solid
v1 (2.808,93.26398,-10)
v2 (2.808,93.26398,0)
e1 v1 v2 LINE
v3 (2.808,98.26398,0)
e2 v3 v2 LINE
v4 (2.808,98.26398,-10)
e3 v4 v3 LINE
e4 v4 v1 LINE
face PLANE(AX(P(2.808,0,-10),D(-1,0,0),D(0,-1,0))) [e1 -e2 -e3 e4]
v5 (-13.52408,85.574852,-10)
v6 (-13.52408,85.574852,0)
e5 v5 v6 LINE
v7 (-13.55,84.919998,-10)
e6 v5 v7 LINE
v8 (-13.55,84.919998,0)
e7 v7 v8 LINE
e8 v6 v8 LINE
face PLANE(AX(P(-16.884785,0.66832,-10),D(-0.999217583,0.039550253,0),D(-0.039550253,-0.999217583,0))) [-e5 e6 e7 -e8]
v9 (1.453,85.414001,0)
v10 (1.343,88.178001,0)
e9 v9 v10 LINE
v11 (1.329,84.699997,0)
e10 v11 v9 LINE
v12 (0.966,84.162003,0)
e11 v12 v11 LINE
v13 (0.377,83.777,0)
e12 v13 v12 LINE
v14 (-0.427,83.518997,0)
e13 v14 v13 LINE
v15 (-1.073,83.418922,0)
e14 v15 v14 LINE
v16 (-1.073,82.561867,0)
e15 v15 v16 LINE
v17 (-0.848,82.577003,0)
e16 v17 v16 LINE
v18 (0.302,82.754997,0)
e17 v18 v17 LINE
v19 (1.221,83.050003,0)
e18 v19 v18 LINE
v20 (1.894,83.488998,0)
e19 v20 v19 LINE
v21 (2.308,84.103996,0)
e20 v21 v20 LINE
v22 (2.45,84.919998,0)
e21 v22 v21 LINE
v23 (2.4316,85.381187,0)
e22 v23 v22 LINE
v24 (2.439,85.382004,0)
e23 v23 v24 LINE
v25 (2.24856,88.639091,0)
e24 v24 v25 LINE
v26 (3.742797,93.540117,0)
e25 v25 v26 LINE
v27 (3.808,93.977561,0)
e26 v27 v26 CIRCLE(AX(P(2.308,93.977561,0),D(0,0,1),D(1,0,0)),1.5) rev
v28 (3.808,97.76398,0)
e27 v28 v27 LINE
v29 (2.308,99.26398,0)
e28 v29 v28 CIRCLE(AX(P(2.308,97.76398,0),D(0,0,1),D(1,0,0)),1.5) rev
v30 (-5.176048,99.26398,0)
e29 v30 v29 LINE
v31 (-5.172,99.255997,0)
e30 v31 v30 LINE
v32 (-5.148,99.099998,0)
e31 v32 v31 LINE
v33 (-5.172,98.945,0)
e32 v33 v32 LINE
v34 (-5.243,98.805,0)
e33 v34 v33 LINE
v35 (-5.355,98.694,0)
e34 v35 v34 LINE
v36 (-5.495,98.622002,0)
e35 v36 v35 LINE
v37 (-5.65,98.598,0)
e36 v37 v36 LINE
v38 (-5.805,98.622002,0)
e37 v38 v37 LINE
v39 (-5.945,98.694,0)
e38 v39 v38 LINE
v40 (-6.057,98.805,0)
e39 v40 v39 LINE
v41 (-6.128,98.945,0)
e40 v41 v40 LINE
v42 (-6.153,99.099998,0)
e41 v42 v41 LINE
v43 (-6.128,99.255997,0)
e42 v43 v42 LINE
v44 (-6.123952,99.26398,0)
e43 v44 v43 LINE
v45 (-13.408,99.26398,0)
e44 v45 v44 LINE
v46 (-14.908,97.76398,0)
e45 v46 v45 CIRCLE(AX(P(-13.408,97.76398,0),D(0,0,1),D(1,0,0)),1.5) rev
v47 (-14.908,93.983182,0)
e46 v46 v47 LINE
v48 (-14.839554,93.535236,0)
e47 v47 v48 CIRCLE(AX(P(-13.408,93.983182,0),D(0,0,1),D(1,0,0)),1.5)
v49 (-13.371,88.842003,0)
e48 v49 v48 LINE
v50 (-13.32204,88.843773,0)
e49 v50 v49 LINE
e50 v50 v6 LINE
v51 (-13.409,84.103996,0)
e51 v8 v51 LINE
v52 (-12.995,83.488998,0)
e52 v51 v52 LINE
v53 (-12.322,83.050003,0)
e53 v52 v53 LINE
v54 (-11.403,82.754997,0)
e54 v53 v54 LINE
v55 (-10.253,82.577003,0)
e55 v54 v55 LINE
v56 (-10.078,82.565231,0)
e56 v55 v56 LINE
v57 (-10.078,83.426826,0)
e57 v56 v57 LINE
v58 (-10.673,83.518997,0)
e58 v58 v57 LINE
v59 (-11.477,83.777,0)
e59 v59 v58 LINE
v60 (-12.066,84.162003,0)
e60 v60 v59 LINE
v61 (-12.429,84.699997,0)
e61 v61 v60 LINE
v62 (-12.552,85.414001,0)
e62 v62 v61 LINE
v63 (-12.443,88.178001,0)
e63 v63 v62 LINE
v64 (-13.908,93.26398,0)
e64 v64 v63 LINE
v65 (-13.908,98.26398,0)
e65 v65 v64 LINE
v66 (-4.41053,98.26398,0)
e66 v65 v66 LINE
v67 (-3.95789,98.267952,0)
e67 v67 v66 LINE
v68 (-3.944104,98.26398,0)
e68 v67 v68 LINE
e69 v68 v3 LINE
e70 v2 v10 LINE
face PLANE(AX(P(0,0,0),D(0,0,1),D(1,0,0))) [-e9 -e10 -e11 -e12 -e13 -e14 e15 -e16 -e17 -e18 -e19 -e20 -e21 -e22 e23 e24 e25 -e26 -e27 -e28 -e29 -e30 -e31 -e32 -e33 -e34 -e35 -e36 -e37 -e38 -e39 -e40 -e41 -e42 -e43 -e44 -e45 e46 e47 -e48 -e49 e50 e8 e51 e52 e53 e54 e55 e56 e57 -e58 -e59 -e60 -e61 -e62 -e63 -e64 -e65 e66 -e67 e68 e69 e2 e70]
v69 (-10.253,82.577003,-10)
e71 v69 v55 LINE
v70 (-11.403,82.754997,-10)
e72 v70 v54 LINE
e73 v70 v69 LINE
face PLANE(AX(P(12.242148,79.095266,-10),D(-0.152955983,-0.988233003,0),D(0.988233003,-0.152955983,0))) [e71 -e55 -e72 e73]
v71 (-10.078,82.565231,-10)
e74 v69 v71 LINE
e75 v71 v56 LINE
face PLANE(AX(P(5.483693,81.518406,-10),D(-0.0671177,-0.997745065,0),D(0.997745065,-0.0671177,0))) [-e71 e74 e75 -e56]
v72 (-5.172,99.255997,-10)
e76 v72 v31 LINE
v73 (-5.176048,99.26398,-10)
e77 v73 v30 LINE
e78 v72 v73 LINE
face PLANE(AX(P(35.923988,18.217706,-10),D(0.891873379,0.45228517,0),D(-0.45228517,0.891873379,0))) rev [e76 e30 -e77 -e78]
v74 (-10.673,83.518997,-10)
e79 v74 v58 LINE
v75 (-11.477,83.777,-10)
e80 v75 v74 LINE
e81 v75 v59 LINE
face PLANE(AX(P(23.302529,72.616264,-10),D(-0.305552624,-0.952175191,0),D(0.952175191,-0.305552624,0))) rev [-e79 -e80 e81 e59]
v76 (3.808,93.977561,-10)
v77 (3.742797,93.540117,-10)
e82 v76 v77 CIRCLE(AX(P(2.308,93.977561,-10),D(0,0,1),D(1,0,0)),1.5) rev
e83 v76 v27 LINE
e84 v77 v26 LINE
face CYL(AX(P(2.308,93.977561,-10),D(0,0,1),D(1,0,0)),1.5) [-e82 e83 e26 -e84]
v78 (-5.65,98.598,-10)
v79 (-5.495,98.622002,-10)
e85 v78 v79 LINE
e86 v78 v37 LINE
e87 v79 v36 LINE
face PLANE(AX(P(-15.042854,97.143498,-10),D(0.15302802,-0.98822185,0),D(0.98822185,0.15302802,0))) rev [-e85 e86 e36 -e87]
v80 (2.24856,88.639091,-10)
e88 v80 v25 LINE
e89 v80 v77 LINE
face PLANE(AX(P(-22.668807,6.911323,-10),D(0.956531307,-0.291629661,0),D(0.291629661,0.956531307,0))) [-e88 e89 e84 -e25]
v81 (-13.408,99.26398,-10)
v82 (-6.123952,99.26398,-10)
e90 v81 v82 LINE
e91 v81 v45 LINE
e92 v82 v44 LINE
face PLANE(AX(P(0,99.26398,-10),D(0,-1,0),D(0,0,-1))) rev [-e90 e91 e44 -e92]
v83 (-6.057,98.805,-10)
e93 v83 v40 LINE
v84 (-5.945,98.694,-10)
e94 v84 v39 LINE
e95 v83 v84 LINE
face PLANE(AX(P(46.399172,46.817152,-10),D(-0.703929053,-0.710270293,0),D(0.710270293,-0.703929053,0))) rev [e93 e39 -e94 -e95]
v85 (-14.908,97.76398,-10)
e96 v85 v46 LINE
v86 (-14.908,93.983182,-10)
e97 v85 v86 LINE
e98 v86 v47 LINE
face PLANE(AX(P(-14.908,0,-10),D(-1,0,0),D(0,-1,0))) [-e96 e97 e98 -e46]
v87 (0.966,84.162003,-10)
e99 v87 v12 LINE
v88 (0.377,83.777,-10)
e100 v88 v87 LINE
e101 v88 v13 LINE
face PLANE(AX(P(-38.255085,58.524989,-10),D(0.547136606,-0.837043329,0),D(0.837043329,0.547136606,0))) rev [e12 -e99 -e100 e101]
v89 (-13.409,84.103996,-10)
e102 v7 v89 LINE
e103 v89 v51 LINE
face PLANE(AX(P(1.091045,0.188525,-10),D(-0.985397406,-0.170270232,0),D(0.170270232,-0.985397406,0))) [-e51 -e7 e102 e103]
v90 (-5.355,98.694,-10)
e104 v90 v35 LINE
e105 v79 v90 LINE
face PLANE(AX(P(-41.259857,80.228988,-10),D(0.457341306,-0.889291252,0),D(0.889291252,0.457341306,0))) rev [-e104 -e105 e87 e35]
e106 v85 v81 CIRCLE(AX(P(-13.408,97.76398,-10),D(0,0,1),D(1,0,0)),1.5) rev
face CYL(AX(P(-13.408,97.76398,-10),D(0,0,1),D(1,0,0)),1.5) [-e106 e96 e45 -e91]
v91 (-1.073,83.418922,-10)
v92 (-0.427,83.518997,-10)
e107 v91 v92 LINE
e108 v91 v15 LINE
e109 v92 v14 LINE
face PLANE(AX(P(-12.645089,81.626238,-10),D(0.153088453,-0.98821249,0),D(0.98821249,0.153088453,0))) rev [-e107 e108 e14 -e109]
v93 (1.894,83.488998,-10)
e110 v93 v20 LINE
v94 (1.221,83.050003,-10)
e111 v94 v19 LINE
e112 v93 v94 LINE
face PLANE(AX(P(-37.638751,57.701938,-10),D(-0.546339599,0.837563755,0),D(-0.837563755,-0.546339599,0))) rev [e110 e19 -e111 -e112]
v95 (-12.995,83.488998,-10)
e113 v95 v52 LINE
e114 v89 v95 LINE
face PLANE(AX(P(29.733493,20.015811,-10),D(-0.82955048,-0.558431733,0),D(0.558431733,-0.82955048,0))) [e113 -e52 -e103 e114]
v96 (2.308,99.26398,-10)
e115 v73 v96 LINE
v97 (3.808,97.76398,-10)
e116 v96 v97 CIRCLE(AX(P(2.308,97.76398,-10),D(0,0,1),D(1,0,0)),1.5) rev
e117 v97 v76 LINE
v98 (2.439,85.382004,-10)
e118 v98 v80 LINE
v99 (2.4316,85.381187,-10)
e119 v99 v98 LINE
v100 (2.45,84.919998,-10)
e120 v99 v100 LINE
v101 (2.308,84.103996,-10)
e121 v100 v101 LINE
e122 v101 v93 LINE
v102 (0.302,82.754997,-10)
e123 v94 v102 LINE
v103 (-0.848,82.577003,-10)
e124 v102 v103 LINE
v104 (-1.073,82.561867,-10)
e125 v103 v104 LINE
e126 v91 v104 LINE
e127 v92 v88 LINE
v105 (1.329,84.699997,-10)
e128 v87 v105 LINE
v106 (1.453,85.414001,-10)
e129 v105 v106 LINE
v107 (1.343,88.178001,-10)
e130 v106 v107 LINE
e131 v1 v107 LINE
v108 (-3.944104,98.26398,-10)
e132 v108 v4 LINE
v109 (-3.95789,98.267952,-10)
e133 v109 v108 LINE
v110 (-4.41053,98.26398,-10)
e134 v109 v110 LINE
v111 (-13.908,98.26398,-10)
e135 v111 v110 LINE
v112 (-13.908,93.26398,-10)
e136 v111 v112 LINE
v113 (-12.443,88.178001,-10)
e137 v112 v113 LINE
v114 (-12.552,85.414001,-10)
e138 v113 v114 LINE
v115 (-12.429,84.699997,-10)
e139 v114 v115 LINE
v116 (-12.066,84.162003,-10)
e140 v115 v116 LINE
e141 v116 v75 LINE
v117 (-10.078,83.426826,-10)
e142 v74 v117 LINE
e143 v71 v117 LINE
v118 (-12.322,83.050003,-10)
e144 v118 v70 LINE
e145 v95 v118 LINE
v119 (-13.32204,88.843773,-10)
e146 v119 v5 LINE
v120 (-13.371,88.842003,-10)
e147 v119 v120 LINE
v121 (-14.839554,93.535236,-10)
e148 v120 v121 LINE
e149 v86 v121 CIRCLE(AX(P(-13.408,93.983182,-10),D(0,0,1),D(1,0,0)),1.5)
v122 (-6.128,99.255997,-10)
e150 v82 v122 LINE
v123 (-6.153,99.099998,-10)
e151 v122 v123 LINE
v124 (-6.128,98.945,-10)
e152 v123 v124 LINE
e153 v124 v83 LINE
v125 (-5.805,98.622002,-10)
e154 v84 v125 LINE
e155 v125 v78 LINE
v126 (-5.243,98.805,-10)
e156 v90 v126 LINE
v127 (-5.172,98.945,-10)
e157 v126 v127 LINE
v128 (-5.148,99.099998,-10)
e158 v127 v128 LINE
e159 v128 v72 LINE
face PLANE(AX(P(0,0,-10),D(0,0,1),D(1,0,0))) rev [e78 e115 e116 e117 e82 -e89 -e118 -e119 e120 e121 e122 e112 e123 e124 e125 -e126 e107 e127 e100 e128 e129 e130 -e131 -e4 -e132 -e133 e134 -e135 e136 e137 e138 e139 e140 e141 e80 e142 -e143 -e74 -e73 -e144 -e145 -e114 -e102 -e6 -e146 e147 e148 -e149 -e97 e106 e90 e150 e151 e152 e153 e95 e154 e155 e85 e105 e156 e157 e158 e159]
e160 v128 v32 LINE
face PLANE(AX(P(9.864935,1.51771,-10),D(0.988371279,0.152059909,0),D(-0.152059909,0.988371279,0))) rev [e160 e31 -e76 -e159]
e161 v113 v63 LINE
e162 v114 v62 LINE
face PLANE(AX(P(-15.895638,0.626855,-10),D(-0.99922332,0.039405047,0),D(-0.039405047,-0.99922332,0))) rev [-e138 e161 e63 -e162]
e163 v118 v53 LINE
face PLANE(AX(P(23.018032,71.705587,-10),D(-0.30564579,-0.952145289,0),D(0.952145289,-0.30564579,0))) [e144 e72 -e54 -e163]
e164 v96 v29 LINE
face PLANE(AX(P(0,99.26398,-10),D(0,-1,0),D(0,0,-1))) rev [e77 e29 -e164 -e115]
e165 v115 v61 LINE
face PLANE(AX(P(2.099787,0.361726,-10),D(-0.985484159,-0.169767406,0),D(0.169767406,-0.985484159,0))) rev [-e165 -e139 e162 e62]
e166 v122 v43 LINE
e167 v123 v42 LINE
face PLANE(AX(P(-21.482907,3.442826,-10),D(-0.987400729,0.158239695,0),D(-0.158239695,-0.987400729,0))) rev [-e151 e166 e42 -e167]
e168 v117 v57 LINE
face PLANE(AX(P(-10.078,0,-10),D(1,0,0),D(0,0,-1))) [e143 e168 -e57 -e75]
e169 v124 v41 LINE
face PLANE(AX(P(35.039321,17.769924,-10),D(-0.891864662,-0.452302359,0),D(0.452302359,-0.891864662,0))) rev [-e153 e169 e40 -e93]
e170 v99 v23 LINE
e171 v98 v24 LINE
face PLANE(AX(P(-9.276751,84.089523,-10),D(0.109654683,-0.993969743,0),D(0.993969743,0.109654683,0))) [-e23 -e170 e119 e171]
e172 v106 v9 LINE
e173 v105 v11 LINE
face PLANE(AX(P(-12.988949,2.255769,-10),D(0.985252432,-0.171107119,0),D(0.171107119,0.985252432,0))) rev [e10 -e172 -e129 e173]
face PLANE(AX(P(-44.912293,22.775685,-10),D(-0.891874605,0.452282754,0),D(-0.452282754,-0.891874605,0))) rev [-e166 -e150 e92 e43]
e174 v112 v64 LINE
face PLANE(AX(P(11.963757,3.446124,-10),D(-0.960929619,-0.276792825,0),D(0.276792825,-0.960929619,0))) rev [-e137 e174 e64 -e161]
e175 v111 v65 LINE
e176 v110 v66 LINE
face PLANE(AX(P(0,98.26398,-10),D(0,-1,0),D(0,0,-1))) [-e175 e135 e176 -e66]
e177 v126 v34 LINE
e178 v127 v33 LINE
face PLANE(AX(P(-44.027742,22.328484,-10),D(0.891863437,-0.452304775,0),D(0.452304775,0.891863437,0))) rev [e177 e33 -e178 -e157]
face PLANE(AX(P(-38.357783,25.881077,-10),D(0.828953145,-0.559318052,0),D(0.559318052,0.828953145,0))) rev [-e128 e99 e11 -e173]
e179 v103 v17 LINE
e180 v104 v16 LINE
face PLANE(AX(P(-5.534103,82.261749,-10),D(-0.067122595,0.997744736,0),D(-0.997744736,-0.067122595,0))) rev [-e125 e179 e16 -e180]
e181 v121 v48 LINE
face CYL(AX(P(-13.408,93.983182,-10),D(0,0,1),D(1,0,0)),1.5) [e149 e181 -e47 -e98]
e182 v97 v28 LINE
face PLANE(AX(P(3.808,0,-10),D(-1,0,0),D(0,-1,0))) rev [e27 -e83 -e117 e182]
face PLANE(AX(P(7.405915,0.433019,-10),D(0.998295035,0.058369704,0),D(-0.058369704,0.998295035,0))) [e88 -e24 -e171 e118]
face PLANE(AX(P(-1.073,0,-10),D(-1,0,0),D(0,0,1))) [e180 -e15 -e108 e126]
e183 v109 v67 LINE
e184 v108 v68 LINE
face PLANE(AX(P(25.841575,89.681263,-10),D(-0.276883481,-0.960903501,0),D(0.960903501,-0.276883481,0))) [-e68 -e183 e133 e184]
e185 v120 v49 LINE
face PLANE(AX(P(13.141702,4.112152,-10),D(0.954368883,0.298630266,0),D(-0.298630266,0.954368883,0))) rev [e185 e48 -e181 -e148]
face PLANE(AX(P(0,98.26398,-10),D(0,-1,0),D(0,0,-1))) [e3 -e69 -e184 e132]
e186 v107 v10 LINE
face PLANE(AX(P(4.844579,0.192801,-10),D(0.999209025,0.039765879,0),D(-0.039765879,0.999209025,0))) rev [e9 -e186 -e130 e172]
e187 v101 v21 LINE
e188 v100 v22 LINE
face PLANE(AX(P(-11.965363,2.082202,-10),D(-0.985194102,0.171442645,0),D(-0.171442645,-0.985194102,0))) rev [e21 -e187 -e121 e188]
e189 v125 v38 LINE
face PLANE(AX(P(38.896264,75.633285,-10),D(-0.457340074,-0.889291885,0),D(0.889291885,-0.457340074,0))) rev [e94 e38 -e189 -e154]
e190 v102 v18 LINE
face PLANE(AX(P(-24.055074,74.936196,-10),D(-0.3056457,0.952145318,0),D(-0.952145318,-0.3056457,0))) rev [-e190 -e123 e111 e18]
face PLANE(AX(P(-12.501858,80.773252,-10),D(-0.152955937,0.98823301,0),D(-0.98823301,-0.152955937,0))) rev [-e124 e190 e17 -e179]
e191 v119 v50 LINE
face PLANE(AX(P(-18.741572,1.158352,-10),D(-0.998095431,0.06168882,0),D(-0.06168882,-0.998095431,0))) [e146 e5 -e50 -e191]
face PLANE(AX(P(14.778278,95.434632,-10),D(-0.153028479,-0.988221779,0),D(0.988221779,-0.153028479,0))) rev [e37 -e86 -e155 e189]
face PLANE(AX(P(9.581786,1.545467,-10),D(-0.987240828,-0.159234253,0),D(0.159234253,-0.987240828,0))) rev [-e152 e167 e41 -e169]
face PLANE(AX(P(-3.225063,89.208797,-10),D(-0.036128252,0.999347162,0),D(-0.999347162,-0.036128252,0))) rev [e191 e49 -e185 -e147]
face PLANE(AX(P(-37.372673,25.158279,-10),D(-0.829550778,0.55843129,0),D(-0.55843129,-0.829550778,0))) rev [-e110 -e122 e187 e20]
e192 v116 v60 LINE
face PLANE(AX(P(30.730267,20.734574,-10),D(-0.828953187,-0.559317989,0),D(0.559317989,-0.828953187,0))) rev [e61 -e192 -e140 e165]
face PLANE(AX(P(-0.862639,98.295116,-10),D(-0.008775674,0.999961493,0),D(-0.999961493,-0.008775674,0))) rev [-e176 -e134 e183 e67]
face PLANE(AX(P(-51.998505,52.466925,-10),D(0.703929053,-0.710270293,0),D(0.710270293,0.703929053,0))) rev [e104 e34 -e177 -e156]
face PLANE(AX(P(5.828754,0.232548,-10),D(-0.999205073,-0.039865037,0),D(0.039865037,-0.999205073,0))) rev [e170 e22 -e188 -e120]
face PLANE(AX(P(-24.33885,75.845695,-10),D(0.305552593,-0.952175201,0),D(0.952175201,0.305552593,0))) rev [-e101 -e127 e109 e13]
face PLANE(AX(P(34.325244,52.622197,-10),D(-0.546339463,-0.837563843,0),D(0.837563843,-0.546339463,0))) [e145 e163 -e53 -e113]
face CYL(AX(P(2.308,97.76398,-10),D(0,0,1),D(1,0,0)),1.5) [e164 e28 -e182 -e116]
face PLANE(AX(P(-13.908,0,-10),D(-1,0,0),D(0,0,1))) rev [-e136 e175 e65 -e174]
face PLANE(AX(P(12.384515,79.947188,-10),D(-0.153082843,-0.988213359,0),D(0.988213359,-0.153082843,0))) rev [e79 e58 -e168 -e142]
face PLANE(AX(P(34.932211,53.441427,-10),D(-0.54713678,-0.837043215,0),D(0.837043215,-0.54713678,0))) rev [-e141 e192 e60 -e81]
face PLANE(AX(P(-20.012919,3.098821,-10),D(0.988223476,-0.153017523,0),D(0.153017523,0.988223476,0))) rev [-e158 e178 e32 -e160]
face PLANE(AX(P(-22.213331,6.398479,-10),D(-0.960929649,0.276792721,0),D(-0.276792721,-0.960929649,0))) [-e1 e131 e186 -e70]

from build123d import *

# Parameters (mm, degrees)
BOSS_EXTRUDE1_DEPTH = 10


# Read off the part's stored shape, not the designer's step: Imported1
with BuildPart() as part:
    # Sketch5 → Boss-Extrude1 (new body)
    with BuildSketch(Plane.XY):
        with BuildLine():
            Line((-6.05700016, 98.805000305), (-6.127999783, 98.944999695))
            Line((-6.127999783, 98.944999695), (-6.152999878, 99.099998474))
            Line((-6.152999878, 99.099998474), (-6.127999783, 99.255996704))
            Line((-6.127999783, 99.255996704), (-6.123951545, 99.263979588))
            Line((-6.123951545, 99.263979588), (-13.408000231, 99.263979588))
            ThreePointArc((-13.408000231, 99.263979588), (-14.468660403, 98.82463976), (-14.908000231, 97.763979588))
            Line((-14.908000231, 97.763979588), (-14.908000231, 93.983181661))
            ThreePointArc((-14.908000231, 93.983181661), (-14.890789829, 93.756609361), (-14.839553555, 93.535236262))
            Line((-14.839553555, 93.535236262), (-13.37100029, 88.842002869))
            Line((-13.37100029, 88.842002869), (-13.322039604, 88.843772888))
            Line((-13.322039604, 88.843772888), (-13.524080276, 85.57485199))
            Line((-13.524080276, 85.57485199), (-13.550000191, 84.919998169))
            Line((-13.550000191, 84.919998169), (-13.409000397, 84.103996277))
            Line((-13.409000397, 84.103996277), (-12.994999886, 83.488998413))
            Line((-12.994999886, 83.488998413), (-12.32199955, 83.050003052))
            Line((-12.32199955, 83.050003052), (-11.402999878, 82.754997253))
            Line((-11.402999878, 82.754997253), (-10.253000259, 82.577003479))
            Line((-10.253000259, 82.577003479), (-10.078000069, 82.565231323))
            Line((-10.078000069, 82.565231323), (-10.078000069, 83.426826477))
            Line((-10.078000069, 83.426826477), (-10.673000336, 83.518997192))
            Line((-10.673000336, 83.518997192), (-11.477000237, 83.777000427))
            Line((-11.477000237, 83.777000427), (-12.065999985, 84.162002563))
            Line((-12.065999985, 84.162002563), (-12.428999901, 84.699996948))
            Line((-12.428999901, 84.699996948), (-12.552000046, 85.414001465))
            Line((-12.552000046, 85.414001465), (-12.44299984, 88.178001404))
            Line((-12.44299984, 88.178001404), (-13.908000231, 93.263979588))
            Line((-13.908000231, 93.263979588), (-13.908000231, 98.263979588))
            Line((-13.908000231, 98.263979588), (-4.410530424, 98.263979588))
            Line((-4.410530424, 98.263979588), (-3.957890034, 98.267951965))
            Line((-3.957890034, 98.267951965), (-3.944104194, 98.263979588))
            Line((-3.944104194, 98.263979588), (2.807999849, 98.263979588))
            Line((2.807999849, 98.263979588), (2.807999849, 93.263979588))
            Line((2.807999849, 93.263979588), (1.343000054, 88.178001404))
            Line((1.343000054, 88.178001404), (1.452999949, 85.414001465))
            Line((1.452999949, 85.414001465), (1.328999996, 84.699996948))
            Line((1.328999996, 84.699996948), (0.966000021, 84.162002563))
            Line((0.966000021, 84.162002563), (0.377000004, 83.777000427))
            Line((0.377000004, 83.777000427), (-0.426999986, 83.518997192))
            Line((-0.426999986, 83.518997192), (-1.072999954, 83.418922424))
            Line((-1.072999954, 83.418922424), (-1.072999954, 82.56186676))
            Line((-1.072999954, 82.56186676), (-0.84799999, 82.577003479))
            Line((-0.84799999, 82.577003479), (0.301999986, 82.754997253))
            Line((0.301999986, 82.754997253), (1.220999956, 83.050003052))
            Line((1.220999956, 83.050003052), (1.894000053, 83.488998413))
            Line((1.894000053, 83.488998413), (2.308000088, 84.103996277))
            Line((2.308000088, 84.103996277), (2.450000048, 84.919998169))
            Line((2.450000048, 84.919998169), (2.431600094, 85.381187439))
            Line((2.431600094, 85.381187439), (2.438999891, 85.382003784))
            Line((2.438999891, 85.382003784), (2.248559952, 88.639091492))
            Line((2.248559952, 88.639091492), (3.742796809, 93.540116743))
            ThreePointArc((3.742796809, 93.540116743), (3.791609542, 93.756422636), (3.807999849, 93.977561235))
            Line((3.807999849, 93.977561235), (3.807999849, 97.763979588))
            ThreePointArc((3.807999849, 97.763979588), (3.368660021, 98.82463976), (2.307999849, 99.263979588))
            Line((2.307999849, 99.263979588), (-5.176048197, 99.263979588))
            Line((-5.176048197, 99.263979588), (-5.171999931, 99.255996704))
            Line((-5.171999931, 99.255996704), (-5.147999763, 99.099998474))
            Line((-5.147999763, 99.099998474), (-5.171999931, 98.944999695))
            Line((-5.171999931, 98.944999695), (-5.243000031, 98.805000305))
            Line((-5.243000031, 98.805000305), (-5.355000019, 98.694000244))
            Line((-5.355000019, 98.694000244), (-5.494999886, 98.622001648))
            Line((-5.494999886, 98.622001648), (-5.650000095, 98.597999573))
            Line((-5.650000095, 98.597999573), (-5.804999828, 98.622001648))
            Line((-5.804999828, 98.622001648), (-5.945000172, 98.694000244))
            Line((-5.945000172, 98.694000244), (-6.05700016, 98.805000305))
        make_face()
    extrude(amount=-BOSS_EXTRUDE1_DEPTH)


solid = part.part
